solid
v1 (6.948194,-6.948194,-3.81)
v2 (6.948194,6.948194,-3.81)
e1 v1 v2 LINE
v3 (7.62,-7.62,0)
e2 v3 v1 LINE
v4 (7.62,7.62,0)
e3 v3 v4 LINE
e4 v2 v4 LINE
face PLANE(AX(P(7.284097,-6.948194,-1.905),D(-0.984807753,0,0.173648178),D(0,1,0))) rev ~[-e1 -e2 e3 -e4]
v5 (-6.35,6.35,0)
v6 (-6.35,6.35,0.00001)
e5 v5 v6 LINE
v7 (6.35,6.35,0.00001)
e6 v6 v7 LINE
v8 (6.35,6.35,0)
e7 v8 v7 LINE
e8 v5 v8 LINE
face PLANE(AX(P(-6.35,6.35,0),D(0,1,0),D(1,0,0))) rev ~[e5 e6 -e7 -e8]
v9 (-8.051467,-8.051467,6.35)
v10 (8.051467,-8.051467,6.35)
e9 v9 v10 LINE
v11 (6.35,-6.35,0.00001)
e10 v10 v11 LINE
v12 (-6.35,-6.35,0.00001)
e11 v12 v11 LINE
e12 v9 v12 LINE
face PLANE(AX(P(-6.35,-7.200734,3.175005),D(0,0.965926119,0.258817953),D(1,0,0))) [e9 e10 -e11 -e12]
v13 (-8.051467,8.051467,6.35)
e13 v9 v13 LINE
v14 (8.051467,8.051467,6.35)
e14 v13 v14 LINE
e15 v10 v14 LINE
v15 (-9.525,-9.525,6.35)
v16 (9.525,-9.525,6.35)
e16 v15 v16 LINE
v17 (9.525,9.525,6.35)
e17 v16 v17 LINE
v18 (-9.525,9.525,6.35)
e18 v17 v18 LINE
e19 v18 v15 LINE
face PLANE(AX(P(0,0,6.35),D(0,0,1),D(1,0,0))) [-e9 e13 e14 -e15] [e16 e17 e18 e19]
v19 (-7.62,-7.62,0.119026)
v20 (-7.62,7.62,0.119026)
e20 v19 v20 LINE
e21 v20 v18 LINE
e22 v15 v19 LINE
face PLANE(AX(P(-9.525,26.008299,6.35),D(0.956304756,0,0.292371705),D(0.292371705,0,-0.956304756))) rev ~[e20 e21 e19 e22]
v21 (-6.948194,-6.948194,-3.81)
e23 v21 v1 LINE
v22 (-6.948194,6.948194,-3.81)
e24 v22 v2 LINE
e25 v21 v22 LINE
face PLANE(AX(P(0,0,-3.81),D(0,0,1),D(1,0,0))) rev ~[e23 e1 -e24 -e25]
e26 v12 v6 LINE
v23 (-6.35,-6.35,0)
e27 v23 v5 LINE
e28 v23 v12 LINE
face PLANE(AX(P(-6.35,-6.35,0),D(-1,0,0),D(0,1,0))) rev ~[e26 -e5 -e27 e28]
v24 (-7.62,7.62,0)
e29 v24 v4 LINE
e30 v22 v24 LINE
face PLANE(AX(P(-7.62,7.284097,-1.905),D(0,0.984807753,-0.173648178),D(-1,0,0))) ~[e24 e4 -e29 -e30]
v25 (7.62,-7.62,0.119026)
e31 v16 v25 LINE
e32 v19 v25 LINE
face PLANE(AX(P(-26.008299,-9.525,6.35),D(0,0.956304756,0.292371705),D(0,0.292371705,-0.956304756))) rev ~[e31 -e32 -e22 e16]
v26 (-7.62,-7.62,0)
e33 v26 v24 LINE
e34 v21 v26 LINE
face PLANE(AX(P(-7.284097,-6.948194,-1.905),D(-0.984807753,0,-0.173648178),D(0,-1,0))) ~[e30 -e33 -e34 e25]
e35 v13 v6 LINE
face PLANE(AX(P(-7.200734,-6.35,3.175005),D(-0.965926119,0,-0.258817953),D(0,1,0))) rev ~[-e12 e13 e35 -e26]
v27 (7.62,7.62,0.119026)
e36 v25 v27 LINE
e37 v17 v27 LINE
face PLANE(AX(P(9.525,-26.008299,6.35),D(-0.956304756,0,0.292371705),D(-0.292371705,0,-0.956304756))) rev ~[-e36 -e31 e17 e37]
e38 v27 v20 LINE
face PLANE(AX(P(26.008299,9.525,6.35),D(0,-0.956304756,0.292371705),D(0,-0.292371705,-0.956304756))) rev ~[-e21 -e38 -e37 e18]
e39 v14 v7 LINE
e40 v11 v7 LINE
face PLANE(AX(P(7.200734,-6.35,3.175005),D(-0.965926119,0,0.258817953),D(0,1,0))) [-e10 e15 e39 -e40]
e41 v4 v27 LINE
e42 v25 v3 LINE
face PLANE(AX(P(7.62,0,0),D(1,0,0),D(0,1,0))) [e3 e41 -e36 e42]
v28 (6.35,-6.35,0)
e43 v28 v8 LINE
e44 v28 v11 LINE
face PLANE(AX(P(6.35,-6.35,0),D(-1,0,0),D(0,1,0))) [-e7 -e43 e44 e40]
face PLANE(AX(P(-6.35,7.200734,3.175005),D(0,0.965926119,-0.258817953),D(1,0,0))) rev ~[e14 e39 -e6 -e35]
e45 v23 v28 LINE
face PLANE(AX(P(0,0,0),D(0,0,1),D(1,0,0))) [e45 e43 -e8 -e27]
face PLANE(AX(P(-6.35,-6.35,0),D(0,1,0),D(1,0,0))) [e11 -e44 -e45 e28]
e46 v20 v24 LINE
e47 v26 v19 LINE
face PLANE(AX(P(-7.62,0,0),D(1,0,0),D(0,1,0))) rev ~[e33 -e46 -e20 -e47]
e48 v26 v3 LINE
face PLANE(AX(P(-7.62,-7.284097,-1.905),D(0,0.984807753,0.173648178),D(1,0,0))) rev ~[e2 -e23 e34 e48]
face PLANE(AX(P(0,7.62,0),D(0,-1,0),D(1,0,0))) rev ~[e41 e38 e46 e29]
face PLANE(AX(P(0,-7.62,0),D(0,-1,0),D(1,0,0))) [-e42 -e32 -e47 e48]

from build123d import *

# Parameters (mm, degrees)
F0_W          = 19.05
F0_H          = 19.05
F0_W_2        = 12.7
F0_H_2        = 12.7
F1_DEPTH      = 6.35
F2_W          = 15.24
F2_H          = 15.24
F3_DEPTH      = 3.81
F4_SIZE2      = 6.34999
F4_SIZE       = 1.701467
F5_T4_DEPTH   = 52.0165982025
F5_T10_DEPTH  = 52.0165982025
F5_T16_DEPTH  = 52.0165982025
F5_T23_DEPTH  = 52.0165982025
F5_T29_DEPTH  = 52.0165982025
F5_T35_DEPTH  = 52.0165982025
F5_T41_DEPTH  = 52.0165982025
F5_T47_DEPTH  = 52.0165982025
F5_T54_DEPTH  = 52.0165982025
F5_T60_DEPTH  = 52.0165982025
F5_T66_DEPTH  = 52.0165982025
F5_T72_DEPTH  = 52.0165982025
F5_T78_DEPTH  = 52.0165982025
F5_T85_DEPTH  = 52.0165982025
F5_T91_DEPTH  = 52.0165982025
F5_T97_DEPTH  = 52.0165982025
F5_T103_DEPTH = 52.0165982025
F5_T109_DEPTH = 52.0165982025
F5_T116_DEPTH = 52.0165982025
F5_T122_DEPTH = 52.0165982025
F6_C1_SIZE2   = 0.6718057965
F6_C1_SIZE    = 3.81
F6_C2_SIZE2   = 0.6718057965
F6_C2_SIZE    = 3.81
F6_C3_SIZE2   = 3.81
F6_C3_SIZE    = 0.6718057965
F6_C4_SIZE2   = 3.81
F6_C4_SIZE    = 0.6718057965


# Not quite as in the source:
# - a fillet or chamfer that OpenCascade refuses, or shapes differently, is made with other operations: its cross-section is extruded or revolved along the edge and cut away or added
# - a fillet or chamfer is up to 0.001 mm smaller than in the source, because OpenCascade refuses the exact size


with BuildPart() as f1:
    # F0 (on Top) → F1 (new body)
    with BuildSketch(Plane.XY):
        Rectangle(F0_W, F0_H)
        Rectangle(F0_W_2, F0_H_2, mode=Mode.SUBTRACT)
    extrude(amount=F1_DEPTH)

    # F2 (on Top) → F3 (join)
    with BuildSketch(Plane.XY):
        Rectangle(F2_W, F2_H)
    extrude(amount=-F3_DEPTH)

    # F4 (size 1.7014773719 and 6.35 in the source; OpenCascade refuses exactly that, so slightly less here)
    f4_edges = [f1.edges().sort_by_distance(p)[0] for p in [
        (0, 6.35, 6.35),
        (6.35, 0, 6.35),
        (0, -6.35, 6.35),
        (-6.35, 0, 6.35),
    ]]
    f4_side = f1.faces().sort_by_distance((9.255592, 0, 6.35))[0]
    chamfer(f4_edges, length=F4_SIZE, length2=F4_SIZE2, reference=f4_side)

    # F5: chamfer of 6.35 x 1.9413898273 on 4 edges, made by hand


with BuildPart() as f5_tool2:
    # F5_s3 → F5_t4 (new body)
    with BuildSketch(Plane.YZ.offset(26.0082991012)):
        Polygon((9.525, 6.35), (7.5836101727, 0), (9.525, 0), align=None)
    extrude(amount=-F5_T4_DEPTH)

    split(bisect_by=Plane.XZ.offset(-7.62), keep=Keep.BOTTOM)

    split(bisect_by=Plane.YZ.offset(7.62), keep=Keep.TOP)


with BuildPart() as f1_1:
    add(f1.part)

    # F5_t1: cut F5_tool2
    add(f5_tool2.part, mode=Mode.SUBTRACT)


with BuildPart() as f5_tool8:
    # F5_s9 → F5_t10 (new body)
    with BuildSketch(Plane.YZ.offset(26.0082991012)):
        Polygon((9.525, 6.35), (7.5836101727, 0), (9.525, 0), align=None)
    extrude(amount=-F5_T10_DEPTH)

    split(bisect_by=Plane.XZ.offset(-7.62), keep=Keep.TOP)

    split(bisect_by=Plane.YZ.offset(7.62), keep=Keep.TOP)


with BuildPart() as f1_2:
    add(f1_1.part)

    # F5_t7: cut F5_tool8
    add(f5_tool8.part, mode=Mode.SUBTRACT)


with BuildPart() as f5_tool14:
    # F5_s15 → F5_t16 (new body)
    with BuildSketch(Plane.YZ.offset(26.0082991012)):
        Polygon((9.525, 6.35), (7.5836101727, 0), (9.525, 0), align=None)
    extrude(amount=-F5_T16_DEPTH)

    split(bisect_by=Plane.XZ.offset(-7.62), keep=Keep.BOTTOM)

    split(bisect_by=Plane.YZ.offset(-7.62), keep=Keep.TOP)

    split(bisect_by=Plane.YZ.offset(7.62), keep=Keep.BOTTOM)


with BuildPart() as f1_3:
    add(f1_2.part)

    # F5_t13: cut F5_tool14
    add(f5_tool14.part, mode=Mode.SUBTRACT)


with BuildPart() as f5_tool21:
    # F5_s22 → F5_t23 (new body)
    with BuildSketch(Plane.YZ.offset(26.0082991012)):
        Polygon((9.525, 6.35), (7.5836101727, 0), (9.525, 0), align=None)
    extrude(amount=-F5_T23_DEPTH)

    split(bisect_by=Plane.XZ.offset(-7.62), keep=Keep.BOTTOM)

    split(bisect_by=Plane.YZ.offset(-7.62), keep=Keep.BOTTOM)


with BuildPart() as f1_4:
    add(f1_3.part)

    # F5_t20: cut F5_tool21
    add(f5_tool21.part, mode=Mode.SUBTRACT)


with BuildPart() as f5_tool27:
    # F5_s28 → F5_t29 (new body)
    with BuildSketch(Plane.YZ.offset(26.0082991012)):
        Polygon((9.525, 6.35), (7.5836101727, 0), (9.525, 0), align=None)
    extrude(amount=-F5_T29_DEPTH)

    split(bisect_by=Plane.XZ.offset(-7.62), keep=Keep.TOP)

    split(bisect_by=Plane.YZ.offset(-7.62), keep=Keep.BOTTOM)


with BuildPart() as f1_5:
    add(f1_4.part)

    # F5_t26: cut F5_tool27
    add(f5_tool27.part, mode=Mode.SUBTRACT)


with BuildPart() as f5_tool33:
    # F5_s34 → F5_t35 (new body)
    with BuildSketch(Plane.XZ.offset(26.0082991012)):
        Polygon((9.525, 6.35), (7.5836101727, 0), (9.525, 0), align=None)
    extrude(amount=-F5_T35_DEPTH)

    split(bisect_by=Plane.XZ.offset(7.62), keep=Keep.TOP)

    split(bisect_by=Plane.YZ.offset(7.62), keep=Keep.TOP)


with BuildPart() as f1_6:
    add(f1_5.part)

    # F5_t32: cut F5_tool33
    add(f5_tool33.part, mode=Mode.SUBTRACT)


with BuildPart() as f5_tool39:
    # F5_s40 → F5_t41 (new body)
    with BuildSketch(Plane.XZ.offset(26.0082991012)):
        Polygon((9.525, 6.35), (7.5836101727, 0), (9.525, 0), align=None)
    extrude(amount=-F5_T41_DEPTH)

    split(bisect_by=Plane.XZ.offset(7.62), keep=Keep.TOP)

    split(bisect_by=Plane.YZ.offset(7.62), keep=Keep.BOTTOM)


with BuildPart() as f1_7:
    add(f1_6.part)

    # F5_t38: cut F5_tool39
    add(f5_tool39.part, mode=Mode.SUBTRACT)


with BuildPart() as f5_tool45:
    # F5_s46 → F5_t47 (new body)
    with BuildSketch(Plane.XZ.offset(26.0082991012)):
        Polygon((9.525, 6.35), (7.5836101727, 0), (9.525, 0), align=None)
    extrude(amount=-F5_T47_DEPTH)

    split(bisect_by=Plane.XZ.offset(-7.62), keep=Keep.TOP)

    split(bisect_by=Plane.XZ.offset(7.62), keep=Keep.BOTTOM)

    split(bisect_by=Plane.YZ.offset(7.62), keep=Keep.TOP)


with BuildPart() as f1_8:
    add(f1_7.part)

    # F5_t44: cut F5_tool45
    add(f5_tool45.part, mode=Mode.SUBTRACT)


with BuildPart() as f5_tool52:
    # F5_s53 → F5_t54 (new body)
    with BuildSketch(Plane.XZ.offset(26.0082991012)):
        Polygon((9.525, 6.35), (7.5836101727, 0), (9.525, 0), align=None)
    extrude(amount=-F5_T54_DEPTH)

    split(bisect_by=Plane.XZ.offset(-7.62), keep=Keep.BOTTOM)

    split(bisect_by=Plane.YZ.offset(7.62), keep=Keep.TOP)


with BuildPart() as f1_9:
    add(f1_8.part)

    # F5_t51: cut F5_tool52
    add(f5_tool52.part, mode=Mode.SUBTRACT)


with BuildPart() as f5_tool58:
    # F5_s59 → F5_t60 (new body)
    with BuildSketch(Plane.XZ.offset(26.0082991012)):
        Polygon((9.525, 6.35), (7.5836101727, 0), (9.525, 0), align=None)
    extrude(amount=-F5_T60_DEPTH)

    split(bisect_by=Plane.XZ.offset(-7.62), keep=Keep.BOTTOM)

    split(bisect_by=Plane.YZ.offset(7.62), keep=Keep.BOTTOM)


with BuildPart() as f1_10:
    add(f1_9.part)

    # F5_t57: cut F5_tool58
    add(f5_tool58.part, mode=Mode.SUBTRACT)


with BuildPart() as f5_tool64:
    # F5_s65 → F5_t66 (new body)
    with BuildSketch(Plane.YZ.offset(-26.0082991012)):
        Polygon((-9.525, 6.35), (-7.5836101727, 0), (-9.525, 0), align=None)
    extrude(amount=F5_T66_DEPTH)

    split(bisect_by=Plane.YZ.offset(-7.62), keep=Keep.BOTTOM)

    split(bisect_by=Plane.XZ.offset(7.62), keep=Keep.TOP)


with BuildPart() as f1_11:
    add(f1_10.part)

    # F5_t63: cut F5_tool64
    add(f5_tool64.part, mode=Mode.SUBTRACT)


with BuildPart() as f5_tool70:
    # F5_s71 → F5_t72 (new body)
    with BuildSketch(Plane.YZ.offset(-26.0082991012)):
        Polygon((-9.525, 6.35), (-7.5836101727, 0), (-9.525, 0), align=None)
    extrude(amount=F5_T72_DEPTH)

    split(bisect_by=Plane.YZ.offset(-7.62), keep=Keep.BOTTOM)

    split(bisect_by=Plane.XZ.offset(7.62), keep=Keep.BOTTOM)


with BuildPart() as f1_12:
    add(f1_11.part)

    # F5_t69: cut F5_tool70
    add(f5_tool70.part, mode=Mode.SUBTRACT)


with BuildPart() as f5_tool76:
    # F5_s77 → F5_t78 (new body)
    with BuildSketch(Plane.YZ.offset(-26.0082991012)):
        Polygon((-9.525, 6.35), (-7.5836101727, 0), (-9.525, 0), align=None)
    extrude(amount=F5_T78_DEPTH)

    split(bisect_by=Plane.YZ.offset(-7.62), keep=Keep.TOP)

    split(bisect_by=Plane.XZ.offset(7.62), keep=Keep.TOP)

    split(bisect_by=Plane.YZ.offset(7.62), keep=Keep.BOTTOM)


with BuildPart() as f1_13:
    add(f1_12.part)

    # F5_t75: cut F5_tool76
    add(f5_tool76.part, mode=Mode.SUBTRACT)


with BuildPart() as f5_tool83:
    # F5_s84 → F5_t85 (new body)
    with BuildSketch(Plane.YZ.offset(-26.0082991012)):
        Polygon((-9.525, 6.35), (-7.5836101727, 0), (-9.525, 0), align=None)
    extrude(amount=F5_T85_DEPTH)

    split(bisect_by=Plane.XZ.offset(7.62), keep=Keep.TOP)

    split(bisect_by=Plane.YZ.offset(7.62), keep=Keep.TOP)


with BuildPart() as f1_14:
    add(f1_13.part)

    # F5_t82: cut F5_tool83
    add(f5_tool83.part, mode=Mode.SUBTRACT)


with BuildPart() as f5_tool89:
    # F5_s90 → F5_t91 (new body)
    with BuildSketch(Plane.YZ.offset(-26.0082991012)):
        Polygon((-9.525, 6.35), (-7.5836101727, 0), (-9.525, 0), align=None)
    extrude(amount=F5_T91_DEPTH)

    split(bisect_by=Plane.XZ.offset(7.62), keep=Keep.BOTTOM)

    split(bisect_by=Plane.YZ.offset(7.62), keep=Keep.TOP)


with BuildPart() as f1_15:
    add(f1_14.part)

    # F5_t88: cut F5_tool89
    add(f5_tool89.part, mode=Mode.SUBTRACT)


with BuildPart() as f5_tool95:
    # F5_s96 → F5_t97 (new body)
    with BuildSketch(Plane.XZ.offset(-26.0082991012)):
        Polygon((-9.525, 6.35), (-7.5836101727, 0), (-9.525, 0), align=None)
    extrude(amount=F5_T97_DEPTH)

    split(bisect_by=Plane.XZ.offset(-7.62), keep=Keep.BOTTOM)

    split(bisect_by=Plane.YZ.offset(-7.62), keep=Keep.BOTTOM)


with BuildPart() as f1_16:
    add(f1_15.part)

    # F5_t94: cut F5_tool95
    add(f5_tool95.part, mode=Mode.SUBTRACT)


with BuildPart() as f5_tool101:
    # F5_s102 → F5_t103 (new body)
    with BuildSketch(Plane.XZ.offset(-26.0082991012)):
        Polygon((-9.525, 6.35), (-7.5836101727, 0), (-9.525, 0), align=None)
    extrude(amount=F5_T103_DEPTH)

    split(bisect_by=Plane.XZ.offset(-7.62), keep=Keep.BOTTOM)

    split(bisect_by=Plane.YZ.offset(-7.62), keep=Keep.TOP)


with BuildPart() as f1_17:
    add(f1_16.part)

    # F5_t100: cut F5_tool101
    add(f5_tool101.part, mode=Mode.SUBTRACT)


with BuildPart() as f5_tool107:
    # F5_s108 → F5_t109 (new body)
    with BuildSketch(Plane.XZ.offset(-26.0082991012)):
        Polygon((-9.525, 6.35), (-7.5836101727, 0), (-9.525, 0), align=None)
    extrude(amount=F5_T109_DEPTH)

    split(bisect_by=Plane.XZ.offset(-7.62), keep=Keep.TOP)

    split(bisect_by=Plane.YZ.offset(-7.62), keep=Keep.BOTTOM)

    split(bisect_by=Plane.XZ.offset(7.62), keep=Keep.BOTTOM)


with BuildPart() as f1_18:
    add(f1_17.part)

    # F5_t106: cut F5_tool107
    add(f5_tool107.part, mode=Mode.SUBTRACT)


with BuildPart() as f5_tool114:
    # F5_s115 → F5_t116 (new body)
    with BuildSketch(Plane.XZ.offset(-26.0082991012)):
        Polygon((-9.525, 6.35), (-7.5836101727, 0), (-9.525, 0), align=None)
    extrude(amount=F5_T116_DEPTH)

    split(bisect_by=Plane.YZ.offset(-7.62), keep=Keep.BOTTOM)

    split(bisect_by=Plane.XZ.offset(7.62), keep=Keep.TOP)


with BuildPart() as f1_19:
    add(f1_18.part)

    # F5_t113: cut F5_tool114
    add(f5_tool114.part, mode=Mode.SUBTRACT)


with BuildPart() as f5_tool120:
    # F5_s121 → F5_t122 (new body)
    with BuildSketch(Plane.XZ.offset(-26.0082991012)):
        Polygon((-9.525, 6.35), (-7.5836101727, 0), (-9.525, 0), align=None)
    extrude(amount=F5_T122_DEPTH)

    split(bisect_by=Plane.YZ.offset(-7.62), keep=Keep.TOP)

    split(bisect_by=Plane.XZ.offset(7.62), keep=Keep.TOP)


with BuildPart() as f1_20:
    add(f1_19.part)

    # F5_t119: cut F5_tool120
    add(f5_tool120.part, mode=Mode.SUBTRACT)

    # F6: chamfer of 3.81 x 0.6718057965 on 4 edges, made by hand

    # F6_c1
    f6_c1_edges = [f1_20.edges().sort_by_distance(p)[0] for p in [
        (0, -7.62, -3.81),
    ]]
    f6_c1_side = f1_20.faces().sort_by_distance((0, -7.62, -3.7965638841))[0]
    chamfer(f6_c1_edges, length=F6_C1_SIZE, length2=F6_C1_SIZE2, reference=f6_c1_side)

    # F6_c2
    f6_c2_edges = [f1_20.edges().sort_by_distance(p)[0] for p in [
        (7.62, 0.3359028982, -3.81),
    ]]
    f6_c2_side = f1_20.faces().sort_by_distance((7.62, 0.3359028982, -3.7965638841))[0]
    chamfer(f6_c2_edges, length=F6_C2_SIZE, length2=F6_C2_SIZE2, reference=f6_c2_side)

    # F6_c3
    f6_c3_edges = [f1_20.edges().sort_by_distance(p)[0] for p in [
        (-0.3359028982, 7.62, -3.81),
    ]]
    f6_c3_side = f1_20.faces().sort_by_distance((-0.3359028982, 7.6065638841, -3.81))[0]
    chamfer(f6_c3_edges, length=F6_C3_SIZE, length2=F6_C3_SIZE2, reference=f6_c3_side)

    # F6_c4
    f6_c4_edges = [f1_20.edges().sort_by_distance(p)[0] for p in [
        (-7.62, 0, -3.81),
    ]]
    f6_c4_side = f1_20.faces().sort_by_distance((-7.6065638841, 0, -3.81))[0]
    chamfer(f6_c4_edges, length=F6_C4_SIZE, length2=F6_C4_SIZE2, reference=f6_c4_side)


solid = f1_20.part
